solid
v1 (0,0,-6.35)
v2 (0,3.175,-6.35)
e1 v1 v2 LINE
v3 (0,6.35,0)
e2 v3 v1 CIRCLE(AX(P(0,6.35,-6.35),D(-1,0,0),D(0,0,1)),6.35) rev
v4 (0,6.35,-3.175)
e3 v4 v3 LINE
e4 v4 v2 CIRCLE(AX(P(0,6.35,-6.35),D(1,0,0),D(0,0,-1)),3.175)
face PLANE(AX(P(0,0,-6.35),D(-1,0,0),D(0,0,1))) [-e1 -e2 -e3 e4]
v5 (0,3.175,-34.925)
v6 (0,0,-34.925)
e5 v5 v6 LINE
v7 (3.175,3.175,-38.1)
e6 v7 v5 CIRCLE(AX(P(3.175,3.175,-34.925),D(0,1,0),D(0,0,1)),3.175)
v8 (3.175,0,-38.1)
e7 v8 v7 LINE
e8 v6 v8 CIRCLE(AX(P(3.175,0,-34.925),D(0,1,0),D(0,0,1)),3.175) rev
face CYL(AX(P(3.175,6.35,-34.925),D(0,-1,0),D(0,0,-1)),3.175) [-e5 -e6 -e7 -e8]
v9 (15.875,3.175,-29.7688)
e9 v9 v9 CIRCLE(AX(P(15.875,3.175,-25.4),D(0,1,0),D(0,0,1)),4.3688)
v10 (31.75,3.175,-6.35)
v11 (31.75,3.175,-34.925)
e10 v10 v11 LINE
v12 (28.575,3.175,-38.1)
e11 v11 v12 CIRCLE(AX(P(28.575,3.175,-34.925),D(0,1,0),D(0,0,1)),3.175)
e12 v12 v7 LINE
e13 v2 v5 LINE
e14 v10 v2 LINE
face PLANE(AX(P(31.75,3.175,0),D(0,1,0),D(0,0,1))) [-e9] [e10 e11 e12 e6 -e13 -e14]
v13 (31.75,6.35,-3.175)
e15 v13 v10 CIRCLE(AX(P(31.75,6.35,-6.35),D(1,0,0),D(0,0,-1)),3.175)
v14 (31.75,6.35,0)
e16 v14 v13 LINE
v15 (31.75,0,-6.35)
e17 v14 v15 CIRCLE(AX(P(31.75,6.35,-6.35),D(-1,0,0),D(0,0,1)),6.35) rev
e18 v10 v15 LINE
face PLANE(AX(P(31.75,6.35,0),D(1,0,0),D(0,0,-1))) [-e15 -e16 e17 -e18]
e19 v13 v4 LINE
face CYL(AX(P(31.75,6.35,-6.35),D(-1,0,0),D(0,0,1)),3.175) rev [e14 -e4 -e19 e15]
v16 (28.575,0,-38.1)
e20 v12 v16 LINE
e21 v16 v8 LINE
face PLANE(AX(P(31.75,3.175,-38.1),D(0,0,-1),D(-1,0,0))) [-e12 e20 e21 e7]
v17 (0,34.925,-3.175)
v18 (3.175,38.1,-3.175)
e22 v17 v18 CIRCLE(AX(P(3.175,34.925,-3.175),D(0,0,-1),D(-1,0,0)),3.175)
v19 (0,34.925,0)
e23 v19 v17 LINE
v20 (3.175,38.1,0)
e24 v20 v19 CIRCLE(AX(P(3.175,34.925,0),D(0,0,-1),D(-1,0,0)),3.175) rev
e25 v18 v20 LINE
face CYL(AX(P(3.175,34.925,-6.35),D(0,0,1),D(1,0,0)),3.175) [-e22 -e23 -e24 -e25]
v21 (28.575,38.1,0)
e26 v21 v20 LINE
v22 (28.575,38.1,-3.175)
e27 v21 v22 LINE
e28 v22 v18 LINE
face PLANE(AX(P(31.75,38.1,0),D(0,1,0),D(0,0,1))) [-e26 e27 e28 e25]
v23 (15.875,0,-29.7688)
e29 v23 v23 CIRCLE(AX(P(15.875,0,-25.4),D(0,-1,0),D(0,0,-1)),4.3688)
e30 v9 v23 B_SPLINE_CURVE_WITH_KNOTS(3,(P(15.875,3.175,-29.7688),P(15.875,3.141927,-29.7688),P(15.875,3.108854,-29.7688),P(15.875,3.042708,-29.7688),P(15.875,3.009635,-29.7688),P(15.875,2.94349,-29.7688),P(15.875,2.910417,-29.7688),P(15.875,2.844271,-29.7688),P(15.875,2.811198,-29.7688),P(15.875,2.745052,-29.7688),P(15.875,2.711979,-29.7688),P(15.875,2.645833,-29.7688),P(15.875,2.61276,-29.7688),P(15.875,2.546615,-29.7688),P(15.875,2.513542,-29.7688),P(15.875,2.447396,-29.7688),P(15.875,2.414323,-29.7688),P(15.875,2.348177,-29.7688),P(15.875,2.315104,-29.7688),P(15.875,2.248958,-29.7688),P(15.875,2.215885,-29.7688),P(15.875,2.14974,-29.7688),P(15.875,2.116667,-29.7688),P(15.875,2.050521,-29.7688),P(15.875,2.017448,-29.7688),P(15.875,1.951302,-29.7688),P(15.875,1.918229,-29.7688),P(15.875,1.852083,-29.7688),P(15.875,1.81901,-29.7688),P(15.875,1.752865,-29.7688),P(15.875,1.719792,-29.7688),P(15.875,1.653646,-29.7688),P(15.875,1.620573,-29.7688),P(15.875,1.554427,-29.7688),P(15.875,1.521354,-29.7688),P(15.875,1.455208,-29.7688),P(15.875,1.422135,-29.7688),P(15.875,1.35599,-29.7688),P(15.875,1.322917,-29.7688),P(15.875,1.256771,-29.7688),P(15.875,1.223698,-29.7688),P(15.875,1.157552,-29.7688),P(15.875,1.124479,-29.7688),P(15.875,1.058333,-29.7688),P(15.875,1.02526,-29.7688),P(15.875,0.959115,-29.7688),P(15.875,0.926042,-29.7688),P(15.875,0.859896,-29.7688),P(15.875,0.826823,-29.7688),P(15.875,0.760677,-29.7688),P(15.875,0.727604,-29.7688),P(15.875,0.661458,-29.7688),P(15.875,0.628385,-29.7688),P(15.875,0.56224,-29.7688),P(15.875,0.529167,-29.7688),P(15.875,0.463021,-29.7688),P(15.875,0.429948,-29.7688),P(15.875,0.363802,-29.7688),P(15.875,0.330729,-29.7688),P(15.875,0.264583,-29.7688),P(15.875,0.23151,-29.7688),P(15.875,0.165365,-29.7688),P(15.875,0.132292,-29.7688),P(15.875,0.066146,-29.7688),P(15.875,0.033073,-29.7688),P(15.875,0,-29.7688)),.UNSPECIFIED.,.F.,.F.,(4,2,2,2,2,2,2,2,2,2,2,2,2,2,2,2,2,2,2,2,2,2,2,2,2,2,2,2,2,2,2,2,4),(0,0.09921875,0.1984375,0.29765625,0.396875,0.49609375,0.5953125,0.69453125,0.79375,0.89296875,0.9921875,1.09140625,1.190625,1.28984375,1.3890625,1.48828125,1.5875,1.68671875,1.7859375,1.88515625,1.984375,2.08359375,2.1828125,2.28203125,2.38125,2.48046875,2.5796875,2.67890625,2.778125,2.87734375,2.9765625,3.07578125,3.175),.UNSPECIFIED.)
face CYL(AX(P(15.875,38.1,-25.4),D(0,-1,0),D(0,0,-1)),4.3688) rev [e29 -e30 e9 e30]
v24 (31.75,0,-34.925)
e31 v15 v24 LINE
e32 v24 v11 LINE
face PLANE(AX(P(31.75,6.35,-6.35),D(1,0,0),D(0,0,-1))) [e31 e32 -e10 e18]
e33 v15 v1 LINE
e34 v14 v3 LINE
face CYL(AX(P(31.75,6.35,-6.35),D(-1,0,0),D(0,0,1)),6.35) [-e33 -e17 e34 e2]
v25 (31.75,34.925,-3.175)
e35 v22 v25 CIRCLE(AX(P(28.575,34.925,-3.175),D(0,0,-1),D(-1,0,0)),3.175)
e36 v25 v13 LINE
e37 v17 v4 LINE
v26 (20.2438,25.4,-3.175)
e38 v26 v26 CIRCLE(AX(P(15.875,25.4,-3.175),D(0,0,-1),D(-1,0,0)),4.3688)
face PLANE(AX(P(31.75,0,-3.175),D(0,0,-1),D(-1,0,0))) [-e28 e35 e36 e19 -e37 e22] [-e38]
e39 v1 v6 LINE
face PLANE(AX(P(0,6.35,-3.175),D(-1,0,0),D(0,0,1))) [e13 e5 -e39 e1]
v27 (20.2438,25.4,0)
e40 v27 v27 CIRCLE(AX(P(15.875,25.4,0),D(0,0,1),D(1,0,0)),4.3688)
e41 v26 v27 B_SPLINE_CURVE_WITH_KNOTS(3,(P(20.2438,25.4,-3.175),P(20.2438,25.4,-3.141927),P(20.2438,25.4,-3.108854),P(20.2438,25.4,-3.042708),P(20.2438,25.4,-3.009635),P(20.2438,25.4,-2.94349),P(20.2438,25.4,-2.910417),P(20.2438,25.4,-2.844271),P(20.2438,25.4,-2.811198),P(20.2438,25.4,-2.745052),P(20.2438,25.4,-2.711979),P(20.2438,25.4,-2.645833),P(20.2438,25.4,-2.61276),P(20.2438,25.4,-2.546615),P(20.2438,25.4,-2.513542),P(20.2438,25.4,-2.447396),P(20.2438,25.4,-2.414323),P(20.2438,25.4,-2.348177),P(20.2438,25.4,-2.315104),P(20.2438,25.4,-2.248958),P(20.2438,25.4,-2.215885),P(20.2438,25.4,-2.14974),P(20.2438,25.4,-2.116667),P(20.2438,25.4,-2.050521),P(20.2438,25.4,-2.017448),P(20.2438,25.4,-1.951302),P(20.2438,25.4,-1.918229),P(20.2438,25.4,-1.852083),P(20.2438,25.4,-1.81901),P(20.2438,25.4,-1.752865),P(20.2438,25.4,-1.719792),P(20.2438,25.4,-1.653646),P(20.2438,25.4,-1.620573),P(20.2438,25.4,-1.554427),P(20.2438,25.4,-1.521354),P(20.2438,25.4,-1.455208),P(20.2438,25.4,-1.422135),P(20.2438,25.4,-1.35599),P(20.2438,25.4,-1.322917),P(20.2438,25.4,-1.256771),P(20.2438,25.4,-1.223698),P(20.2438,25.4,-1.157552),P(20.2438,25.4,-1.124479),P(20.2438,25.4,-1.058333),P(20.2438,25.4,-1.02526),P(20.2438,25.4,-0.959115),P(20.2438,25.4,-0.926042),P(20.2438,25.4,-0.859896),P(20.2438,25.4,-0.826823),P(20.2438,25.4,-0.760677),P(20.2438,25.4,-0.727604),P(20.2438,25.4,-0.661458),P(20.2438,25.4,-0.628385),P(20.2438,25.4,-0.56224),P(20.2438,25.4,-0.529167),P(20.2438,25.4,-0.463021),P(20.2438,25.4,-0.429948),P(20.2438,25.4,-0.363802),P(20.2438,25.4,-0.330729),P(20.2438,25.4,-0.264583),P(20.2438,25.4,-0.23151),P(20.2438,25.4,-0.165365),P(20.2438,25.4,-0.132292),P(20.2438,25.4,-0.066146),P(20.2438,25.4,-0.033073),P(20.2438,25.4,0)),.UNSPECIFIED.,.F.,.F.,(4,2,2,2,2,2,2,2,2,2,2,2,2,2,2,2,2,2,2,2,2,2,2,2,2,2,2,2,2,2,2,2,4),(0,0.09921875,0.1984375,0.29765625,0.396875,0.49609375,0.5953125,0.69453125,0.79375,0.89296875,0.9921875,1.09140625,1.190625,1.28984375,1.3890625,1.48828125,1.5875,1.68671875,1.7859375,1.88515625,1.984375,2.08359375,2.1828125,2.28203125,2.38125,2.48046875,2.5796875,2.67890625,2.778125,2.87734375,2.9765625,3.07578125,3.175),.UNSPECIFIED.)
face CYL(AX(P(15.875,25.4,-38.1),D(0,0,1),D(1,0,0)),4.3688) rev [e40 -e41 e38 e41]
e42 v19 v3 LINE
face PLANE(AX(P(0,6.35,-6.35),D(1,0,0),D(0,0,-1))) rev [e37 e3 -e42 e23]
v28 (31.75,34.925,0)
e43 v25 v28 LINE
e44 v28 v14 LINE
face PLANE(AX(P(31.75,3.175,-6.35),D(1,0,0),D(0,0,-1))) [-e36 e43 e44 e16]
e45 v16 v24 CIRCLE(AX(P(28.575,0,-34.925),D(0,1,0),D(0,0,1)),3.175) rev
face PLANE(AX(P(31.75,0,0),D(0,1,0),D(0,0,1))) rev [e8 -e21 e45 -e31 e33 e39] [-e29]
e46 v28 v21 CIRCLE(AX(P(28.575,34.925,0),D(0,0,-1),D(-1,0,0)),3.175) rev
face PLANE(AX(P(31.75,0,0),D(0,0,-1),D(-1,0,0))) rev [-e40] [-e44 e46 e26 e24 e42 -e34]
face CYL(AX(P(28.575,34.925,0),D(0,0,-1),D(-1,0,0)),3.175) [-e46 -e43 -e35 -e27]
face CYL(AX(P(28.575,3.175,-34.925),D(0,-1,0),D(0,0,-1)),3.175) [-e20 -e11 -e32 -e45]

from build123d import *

# Parameters (mm, degrees)
BASE_FLANGE1_DEPTH = 31.75
SKETCH6_R          = 4.3688
CUT_EXTRUDE1_DEPTH = 63.540247041
SKETCH7_R          = 4.3688
CUT_EXTRUDE2_DEPTH = 63.540247041
FILLET1_R          = 3.175


# Sheet-metal steps are written as plain solids
with BuildPart() as part:
    # Sketch1 → Base-Flange1 (new body)
    with BuildSketch(Plane(origin=(0, 0, 0), x_dir=(0, 0, -1), z_dir=(1, 0, 0))):
        with BuildLine():
            Line((38.1, 0), (6.35, 0))
            ThreePointArc((6.35, 0), (1.859871939, 1.859871939), (0, 6.35))
            Line((0, 6.35), (0, 38.1))
            Line((0, 38.1), (3.175, 38.1))
            Line((3.175, 38.1), (3.175, 6.35))
            ThreePointArc((3.175, 6.35), (4.10493597, 4.10493597), (6.35, 3.175))
            Line((6.35, 3.175), (38.1, 3.175))
            Line((38.1, 3.175), (38.1, 0))
        make_face()
    extrude(amount=BASE_FLANGE1_DEPTH)

    # Sketch6 → Cut-Extrude1 (cut, through all)
    with BuildSketch(Plane.XY):
        with Locations((15.875, 25.4)):
            Circle(SKETCH6_R)
    extrude(amount=-CUT_EXTRUDE1_DEPTH, mode=Mode.SUBTRACT)

    # Sketch7 → Cut-Extrude2 (cut, through all)
    with BuildSketch(Plane.XZ):
        with Locations(Location((15.875, -25.4, 0), (0, 0, 270))):
            Circle(SKETCH7_R)
    extrude(amount=-CUT_EXTRUDE2_DEPTH, mode=Mode.SUBTRACT)

    # Fillet1
    fillet1_edges = [part.edges().sort_by_distance(p)[0] for p in [
        (31.75, 38.1, -1.5875),
        (0, 38.1, -1.5875),
        (31.75, 1.5875, -38.1),
        (0, 1.5875, -38.1),
    ]]
    fillet(fillet1_edges, radius=FILLET1_R)


solid = part.part
